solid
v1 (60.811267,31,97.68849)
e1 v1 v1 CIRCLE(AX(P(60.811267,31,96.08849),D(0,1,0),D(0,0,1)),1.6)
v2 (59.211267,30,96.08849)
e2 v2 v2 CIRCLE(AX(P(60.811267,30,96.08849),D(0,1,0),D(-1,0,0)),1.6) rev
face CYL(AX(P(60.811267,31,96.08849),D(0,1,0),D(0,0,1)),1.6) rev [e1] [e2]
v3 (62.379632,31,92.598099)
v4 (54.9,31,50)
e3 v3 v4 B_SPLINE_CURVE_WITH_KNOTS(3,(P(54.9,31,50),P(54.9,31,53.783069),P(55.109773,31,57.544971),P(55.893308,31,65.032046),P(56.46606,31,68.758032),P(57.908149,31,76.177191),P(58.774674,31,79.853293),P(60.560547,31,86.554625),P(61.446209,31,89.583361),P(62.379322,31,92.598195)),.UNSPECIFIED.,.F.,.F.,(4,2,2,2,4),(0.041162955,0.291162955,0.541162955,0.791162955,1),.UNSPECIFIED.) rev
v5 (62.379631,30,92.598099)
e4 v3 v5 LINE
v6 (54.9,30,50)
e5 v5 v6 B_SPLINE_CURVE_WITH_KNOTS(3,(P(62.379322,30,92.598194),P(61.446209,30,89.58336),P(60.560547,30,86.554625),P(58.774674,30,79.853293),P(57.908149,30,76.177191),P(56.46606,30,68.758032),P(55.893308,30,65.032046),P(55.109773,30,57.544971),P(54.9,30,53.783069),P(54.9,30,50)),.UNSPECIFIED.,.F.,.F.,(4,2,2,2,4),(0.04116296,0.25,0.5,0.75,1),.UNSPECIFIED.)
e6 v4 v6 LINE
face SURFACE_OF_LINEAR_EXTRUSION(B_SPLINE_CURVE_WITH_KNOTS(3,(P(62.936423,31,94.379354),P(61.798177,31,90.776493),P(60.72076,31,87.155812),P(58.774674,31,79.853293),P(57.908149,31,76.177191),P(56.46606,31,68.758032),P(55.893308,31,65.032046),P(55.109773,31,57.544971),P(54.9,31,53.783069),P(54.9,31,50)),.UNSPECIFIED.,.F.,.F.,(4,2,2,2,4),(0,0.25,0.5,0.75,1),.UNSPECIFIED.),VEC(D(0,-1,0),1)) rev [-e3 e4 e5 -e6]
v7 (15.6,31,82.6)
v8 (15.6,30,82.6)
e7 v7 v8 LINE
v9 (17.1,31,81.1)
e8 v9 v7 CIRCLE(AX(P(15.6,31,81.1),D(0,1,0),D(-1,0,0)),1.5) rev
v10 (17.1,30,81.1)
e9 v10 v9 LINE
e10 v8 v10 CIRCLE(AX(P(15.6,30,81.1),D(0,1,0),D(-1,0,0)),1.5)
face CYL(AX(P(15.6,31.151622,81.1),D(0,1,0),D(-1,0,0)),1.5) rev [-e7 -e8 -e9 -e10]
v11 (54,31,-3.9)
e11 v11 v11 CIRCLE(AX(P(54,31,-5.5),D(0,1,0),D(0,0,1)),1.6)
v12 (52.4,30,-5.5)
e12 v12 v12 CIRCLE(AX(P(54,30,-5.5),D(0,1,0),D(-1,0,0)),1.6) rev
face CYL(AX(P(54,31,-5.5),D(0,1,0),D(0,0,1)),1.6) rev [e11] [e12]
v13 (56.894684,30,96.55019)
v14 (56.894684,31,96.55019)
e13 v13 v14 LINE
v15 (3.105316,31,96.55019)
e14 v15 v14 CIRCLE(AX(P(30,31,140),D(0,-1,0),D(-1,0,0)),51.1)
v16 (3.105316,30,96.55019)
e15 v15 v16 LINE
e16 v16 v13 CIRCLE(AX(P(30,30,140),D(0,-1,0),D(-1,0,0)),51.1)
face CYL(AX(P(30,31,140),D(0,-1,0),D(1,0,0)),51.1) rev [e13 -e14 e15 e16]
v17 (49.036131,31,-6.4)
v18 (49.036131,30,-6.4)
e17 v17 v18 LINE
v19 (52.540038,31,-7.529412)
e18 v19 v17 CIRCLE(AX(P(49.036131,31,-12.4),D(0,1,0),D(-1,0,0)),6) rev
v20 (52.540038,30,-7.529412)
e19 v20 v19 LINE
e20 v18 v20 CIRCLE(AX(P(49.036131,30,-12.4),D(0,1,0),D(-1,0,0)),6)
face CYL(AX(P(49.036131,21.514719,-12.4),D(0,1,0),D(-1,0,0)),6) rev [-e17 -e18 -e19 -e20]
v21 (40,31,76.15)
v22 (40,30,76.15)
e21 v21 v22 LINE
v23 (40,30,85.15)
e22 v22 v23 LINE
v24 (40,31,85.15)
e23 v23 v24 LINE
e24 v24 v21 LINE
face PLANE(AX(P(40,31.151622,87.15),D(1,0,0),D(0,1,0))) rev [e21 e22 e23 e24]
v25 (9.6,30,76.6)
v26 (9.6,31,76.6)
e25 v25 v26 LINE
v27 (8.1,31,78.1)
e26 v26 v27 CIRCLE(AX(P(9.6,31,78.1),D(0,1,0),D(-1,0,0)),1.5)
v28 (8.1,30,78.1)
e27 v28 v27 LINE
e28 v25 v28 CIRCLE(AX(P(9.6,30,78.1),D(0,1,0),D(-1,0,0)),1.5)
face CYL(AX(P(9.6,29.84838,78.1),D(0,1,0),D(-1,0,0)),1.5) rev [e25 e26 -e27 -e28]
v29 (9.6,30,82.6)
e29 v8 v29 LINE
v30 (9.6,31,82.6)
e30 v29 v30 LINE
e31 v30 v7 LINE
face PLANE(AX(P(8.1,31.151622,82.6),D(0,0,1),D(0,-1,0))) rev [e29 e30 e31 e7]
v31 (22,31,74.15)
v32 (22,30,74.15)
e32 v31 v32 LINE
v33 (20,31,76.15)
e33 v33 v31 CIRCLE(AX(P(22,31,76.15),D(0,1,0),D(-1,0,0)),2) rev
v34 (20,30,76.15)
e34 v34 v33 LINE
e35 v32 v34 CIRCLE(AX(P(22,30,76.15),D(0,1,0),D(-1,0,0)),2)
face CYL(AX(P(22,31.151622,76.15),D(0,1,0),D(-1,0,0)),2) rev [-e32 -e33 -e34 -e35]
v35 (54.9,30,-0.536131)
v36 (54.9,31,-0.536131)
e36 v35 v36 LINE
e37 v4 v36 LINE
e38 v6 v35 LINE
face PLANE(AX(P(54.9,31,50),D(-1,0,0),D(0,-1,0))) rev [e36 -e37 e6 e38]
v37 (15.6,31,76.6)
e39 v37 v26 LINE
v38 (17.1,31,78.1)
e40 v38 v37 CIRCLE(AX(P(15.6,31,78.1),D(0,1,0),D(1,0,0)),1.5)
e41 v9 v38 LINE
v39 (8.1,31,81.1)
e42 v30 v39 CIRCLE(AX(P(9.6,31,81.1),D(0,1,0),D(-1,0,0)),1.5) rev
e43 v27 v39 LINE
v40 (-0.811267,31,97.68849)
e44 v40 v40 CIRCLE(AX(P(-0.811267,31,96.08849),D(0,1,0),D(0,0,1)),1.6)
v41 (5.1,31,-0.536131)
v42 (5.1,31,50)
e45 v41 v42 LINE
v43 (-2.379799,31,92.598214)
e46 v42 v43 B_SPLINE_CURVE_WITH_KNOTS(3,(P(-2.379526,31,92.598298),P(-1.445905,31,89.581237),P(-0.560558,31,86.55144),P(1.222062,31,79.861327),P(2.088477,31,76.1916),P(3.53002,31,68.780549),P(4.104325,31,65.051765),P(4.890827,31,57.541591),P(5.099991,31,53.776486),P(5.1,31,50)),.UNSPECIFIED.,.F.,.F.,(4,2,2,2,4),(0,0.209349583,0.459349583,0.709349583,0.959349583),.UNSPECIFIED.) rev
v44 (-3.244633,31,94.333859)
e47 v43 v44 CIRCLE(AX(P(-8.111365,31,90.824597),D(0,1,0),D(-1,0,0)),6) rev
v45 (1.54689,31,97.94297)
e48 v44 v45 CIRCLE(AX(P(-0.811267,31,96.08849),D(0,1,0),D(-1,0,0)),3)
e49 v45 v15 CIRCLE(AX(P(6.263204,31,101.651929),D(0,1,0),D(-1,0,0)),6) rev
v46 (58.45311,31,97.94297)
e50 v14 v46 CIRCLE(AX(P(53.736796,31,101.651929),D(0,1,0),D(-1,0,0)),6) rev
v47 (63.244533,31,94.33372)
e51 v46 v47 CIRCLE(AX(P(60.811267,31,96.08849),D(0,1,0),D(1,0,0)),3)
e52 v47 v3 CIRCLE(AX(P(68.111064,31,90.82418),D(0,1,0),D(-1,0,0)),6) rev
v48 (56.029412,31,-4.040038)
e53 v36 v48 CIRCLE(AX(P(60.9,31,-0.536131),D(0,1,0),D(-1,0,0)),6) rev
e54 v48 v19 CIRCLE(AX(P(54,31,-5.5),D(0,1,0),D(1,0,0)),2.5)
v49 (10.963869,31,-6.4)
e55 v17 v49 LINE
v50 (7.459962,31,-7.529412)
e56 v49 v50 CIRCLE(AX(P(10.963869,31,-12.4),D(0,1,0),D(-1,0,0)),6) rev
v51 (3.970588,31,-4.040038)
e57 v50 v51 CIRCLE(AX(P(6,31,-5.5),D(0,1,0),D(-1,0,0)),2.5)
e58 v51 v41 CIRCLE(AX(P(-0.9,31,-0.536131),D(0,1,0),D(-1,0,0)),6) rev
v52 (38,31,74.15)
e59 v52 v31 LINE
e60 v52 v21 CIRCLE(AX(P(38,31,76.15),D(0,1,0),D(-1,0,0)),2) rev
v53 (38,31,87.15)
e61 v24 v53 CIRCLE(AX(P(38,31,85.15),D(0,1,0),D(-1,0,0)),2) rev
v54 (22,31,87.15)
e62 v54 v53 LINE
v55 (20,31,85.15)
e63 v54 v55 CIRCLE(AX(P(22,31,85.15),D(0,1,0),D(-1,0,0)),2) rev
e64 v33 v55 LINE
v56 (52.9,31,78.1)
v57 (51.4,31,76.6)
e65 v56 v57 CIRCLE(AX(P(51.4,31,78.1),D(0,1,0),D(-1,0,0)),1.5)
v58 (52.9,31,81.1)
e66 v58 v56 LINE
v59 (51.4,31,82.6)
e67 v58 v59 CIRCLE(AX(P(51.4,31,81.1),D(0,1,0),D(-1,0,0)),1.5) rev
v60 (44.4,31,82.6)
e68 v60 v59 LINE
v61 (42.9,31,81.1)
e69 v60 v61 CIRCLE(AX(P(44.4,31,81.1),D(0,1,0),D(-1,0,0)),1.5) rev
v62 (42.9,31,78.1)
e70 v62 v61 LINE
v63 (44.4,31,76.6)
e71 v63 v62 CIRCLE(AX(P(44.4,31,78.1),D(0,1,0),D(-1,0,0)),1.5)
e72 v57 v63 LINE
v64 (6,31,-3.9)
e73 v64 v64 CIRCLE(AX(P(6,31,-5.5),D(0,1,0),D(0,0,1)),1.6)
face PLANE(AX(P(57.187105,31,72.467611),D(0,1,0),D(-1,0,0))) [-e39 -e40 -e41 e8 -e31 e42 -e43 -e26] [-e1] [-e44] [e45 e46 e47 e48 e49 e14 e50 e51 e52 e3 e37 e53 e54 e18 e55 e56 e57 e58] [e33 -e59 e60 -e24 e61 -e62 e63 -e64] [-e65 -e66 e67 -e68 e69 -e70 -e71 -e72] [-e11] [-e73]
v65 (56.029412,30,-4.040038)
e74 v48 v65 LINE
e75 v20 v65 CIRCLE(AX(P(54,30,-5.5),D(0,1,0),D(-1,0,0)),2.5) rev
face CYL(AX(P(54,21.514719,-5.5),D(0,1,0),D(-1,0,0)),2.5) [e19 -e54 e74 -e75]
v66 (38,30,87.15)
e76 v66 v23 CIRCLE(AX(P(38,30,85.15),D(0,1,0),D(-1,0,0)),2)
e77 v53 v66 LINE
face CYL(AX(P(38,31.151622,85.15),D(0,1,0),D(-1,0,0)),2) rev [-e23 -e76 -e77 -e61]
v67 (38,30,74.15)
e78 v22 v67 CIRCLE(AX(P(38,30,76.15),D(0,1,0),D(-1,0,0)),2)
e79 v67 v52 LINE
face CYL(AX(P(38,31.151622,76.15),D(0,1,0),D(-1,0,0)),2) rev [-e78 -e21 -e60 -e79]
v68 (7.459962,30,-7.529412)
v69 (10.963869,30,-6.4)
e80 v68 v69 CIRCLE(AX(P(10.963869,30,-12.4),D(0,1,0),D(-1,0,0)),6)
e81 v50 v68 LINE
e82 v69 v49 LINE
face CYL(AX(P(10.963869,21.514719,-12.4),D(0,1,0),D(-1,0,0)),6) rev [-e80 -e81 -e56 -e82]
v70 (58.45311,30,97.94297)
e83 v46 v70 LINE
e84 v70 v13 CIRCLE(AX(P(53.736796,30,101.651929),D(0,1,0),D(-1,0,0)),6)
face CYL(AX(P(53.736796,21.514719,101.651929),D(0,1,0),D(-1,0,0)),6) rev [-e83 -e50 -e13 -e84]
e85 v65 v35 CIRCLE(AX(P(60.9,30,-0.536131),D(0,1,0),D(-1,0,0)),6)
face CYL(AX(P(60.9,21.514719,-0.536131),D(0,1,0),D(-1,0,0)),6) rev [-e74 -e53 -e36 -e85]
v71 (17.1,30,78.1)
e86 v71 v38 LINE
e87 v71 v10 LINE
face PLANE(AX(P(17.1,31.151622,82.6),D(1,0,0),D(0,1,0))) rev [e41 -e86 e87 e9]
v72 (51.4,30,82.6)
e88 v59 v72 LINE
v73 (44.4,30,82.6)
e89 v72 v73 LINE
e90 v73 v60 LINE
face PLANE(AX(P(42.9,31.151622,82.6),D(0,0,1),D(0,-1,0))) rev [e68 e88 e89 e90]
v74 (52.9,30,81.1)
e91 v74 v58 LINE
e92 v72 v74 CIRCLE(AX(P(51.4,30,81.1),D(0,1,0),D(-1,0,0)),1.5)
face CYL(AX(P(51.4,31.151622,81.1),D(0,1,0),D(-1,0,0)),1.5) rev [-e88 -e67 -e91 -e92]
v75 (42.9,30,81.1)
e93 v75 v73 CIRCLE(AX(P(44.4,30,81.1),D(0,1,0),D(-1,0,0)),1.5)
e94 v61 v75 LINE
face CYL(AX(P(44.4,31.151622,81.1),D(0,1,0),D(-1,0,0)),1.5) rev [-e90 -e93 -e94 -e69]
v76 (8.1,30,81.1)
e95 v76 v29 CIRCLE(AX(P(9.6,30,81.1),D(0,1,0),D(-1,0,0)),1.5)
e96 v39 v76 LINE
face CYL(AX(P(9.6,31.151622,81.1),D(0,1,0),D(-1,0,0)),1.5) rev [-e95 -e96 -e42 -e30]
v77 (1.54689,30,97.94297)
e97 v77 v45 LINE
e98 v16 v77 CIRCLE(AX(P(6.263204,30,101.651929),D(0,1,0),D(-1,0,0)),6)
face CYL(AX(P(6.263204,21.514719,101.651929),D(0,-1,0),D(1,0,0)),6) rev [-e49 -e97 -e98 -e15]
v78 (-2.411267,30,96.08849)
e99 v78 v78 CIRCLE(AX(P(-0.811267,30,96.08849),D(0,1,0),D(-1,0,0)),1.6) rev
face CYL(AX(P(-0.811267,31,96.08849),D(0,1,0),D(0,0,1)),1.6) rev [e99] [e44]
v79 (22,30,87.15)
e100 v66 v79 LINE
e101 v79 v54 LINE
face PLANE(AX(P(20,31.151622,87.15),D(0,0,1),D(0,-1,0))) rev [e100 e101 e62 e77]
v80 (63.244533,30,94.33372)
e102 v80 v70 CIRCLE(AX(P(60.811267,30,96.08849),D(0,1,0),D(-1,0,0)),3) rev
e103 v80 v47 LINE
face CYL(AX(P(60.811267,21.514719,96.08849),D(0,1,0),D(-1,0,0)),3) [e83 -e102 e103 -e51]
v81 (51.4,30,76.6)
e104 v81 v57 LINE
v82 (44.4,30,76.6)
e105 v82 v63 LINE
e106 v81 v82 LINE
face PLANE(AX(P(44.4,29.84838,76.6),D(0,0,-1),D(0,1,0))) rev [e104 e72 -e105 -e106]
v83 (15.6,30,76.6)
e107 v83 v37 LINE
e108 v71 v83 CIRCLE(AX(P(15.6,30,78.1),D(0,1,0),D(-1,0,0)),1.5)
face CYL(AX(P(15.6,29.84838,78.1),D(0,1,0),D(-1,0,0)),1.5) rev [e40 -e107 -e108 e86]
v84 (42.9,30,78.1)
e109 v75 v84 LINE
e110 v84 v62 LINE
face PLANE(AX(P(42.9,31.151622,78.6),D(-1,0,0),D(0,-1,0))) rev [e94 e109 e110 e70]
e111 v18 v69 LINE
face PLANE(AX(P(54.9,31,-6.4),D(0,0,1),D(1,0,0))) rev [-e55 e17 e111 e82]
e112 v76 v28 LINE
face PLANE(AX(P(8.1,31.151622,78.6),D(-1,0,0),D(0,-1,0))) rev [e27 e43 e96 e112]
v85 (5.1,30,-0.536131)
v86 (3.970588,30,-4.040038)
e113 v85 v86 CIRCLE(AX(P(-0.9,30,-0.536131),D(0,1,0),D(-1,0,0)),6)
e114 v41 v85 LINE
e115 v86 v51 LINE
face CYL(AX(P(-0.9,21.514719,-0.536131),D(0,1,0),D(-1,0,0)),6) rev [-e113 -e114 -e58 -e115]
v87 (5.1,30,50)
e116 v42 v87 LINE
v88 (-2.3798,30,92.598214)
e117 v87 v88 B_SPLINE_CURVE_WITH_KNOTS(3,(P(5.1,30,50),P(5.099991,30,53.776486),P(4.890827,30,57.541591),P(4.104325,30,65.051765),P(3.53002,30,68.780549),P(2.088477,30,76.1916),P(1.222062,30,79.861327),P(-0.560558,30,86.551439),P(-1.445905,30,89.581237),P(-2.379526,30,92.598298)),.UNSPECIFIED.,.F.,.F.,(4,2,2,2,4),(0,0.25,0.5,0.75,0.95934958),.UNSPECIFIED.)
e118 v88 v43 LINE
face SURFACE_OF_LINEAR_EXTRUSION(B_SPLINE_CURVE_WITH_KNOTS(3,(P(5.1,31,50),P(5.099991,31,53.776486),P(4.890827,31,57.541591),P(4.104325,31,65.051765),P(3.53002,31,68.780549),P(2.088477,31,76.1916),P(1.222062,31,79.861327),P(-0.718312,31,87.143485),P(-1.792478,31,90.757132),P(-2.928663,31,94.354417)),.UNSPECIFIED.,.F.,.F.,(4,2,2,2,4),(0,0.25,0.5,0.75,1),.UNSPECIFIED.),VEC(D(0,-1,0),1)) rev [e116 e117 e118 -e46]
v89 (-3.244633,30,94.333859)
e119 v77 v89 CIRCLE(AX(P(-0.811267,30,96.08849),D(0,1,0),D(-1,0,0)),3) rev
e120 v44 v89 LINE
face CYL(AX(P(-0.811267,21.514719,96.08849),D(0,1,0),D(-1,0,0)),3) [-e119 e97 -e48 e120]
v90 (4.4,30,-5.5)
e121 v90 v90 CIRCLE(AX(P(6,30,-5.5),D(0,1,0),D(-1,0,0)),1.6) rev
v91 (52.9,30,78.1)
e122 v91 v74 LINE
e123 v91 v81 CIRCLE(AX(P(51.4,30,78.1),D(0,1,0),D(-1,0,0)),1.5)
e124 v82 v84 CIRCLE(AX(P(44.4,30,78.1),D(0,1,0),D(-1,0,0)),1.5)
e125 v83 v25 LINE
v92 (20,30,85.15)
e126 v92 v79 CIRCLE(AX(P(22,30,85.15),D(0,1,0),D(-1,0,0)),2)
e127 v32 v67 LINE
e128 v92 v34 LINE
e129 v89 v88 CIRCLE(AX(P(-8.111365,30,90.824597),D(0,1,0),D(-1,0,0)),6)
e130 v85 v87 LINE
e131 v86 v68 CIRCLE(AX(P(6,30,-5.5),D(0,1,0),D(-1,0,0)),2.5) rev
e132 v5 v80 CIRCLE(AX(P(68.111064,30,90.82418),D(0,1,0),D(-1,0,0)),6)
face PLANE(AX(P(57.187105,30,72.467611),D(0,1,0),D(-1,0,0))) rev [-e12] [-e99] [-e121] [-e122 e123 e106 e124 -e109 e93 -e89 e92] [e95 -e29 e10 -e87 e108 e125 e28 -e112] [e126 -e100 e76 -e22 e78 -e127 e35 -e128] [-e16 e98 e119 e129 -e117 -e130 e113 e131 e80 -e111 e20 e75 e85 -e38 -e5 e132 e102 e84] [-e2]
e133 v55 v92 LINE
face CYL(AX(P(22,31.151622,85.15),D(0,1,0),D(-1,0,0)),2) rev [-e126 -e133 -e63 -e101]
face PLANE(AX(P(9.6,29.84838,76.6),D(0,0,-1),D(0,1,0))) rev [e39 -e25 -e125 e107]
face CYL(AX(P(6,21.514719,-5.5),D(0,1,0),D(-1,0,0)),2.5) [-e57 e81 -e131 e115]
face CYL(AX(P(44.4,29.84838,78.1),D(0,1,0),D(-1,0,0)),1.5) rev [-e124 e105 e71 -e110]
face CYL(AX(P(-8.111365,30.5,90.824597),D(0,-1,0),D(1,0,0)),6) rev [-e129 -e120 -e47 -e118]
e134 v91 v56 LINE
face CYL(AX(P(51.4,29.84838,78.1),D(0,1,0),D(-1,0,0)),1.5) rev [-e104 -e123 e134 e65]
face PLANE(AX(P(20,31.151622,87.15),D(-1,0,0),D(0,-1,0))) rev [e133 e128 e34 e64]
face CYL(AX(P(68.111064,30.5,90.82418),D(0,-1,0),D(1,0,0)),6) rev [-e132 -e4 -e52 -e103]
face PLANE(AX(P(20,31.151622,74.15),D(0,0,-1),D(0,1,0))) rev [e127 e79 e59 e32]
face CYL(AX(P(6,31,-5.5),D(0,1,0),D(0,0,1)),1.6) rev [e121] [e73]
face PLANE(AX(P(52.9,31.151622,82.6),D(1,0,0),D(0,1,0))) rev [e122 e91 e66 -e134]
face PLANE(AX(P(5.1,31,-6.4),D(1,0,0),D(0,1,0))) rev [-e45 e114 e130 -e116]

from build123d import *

# Parameters (mm, degrees)
COVER_MAIN_BOARD_1_START = 30
COVER_MAIN_BOARD_1_DEPTH = 1
SKETCH_2_R               = 2.5
SKETCH_2_R_2             = 3
EXTRUDE_1_DEPTH          = 1
FILLET_1_R               = 6
HOLE_WIZARD_M31_D        = 3.2
SKETCH_5_W               = 20
SKETCH_5_H               = 13
CUT_EXTRUDE_2_DEPTH      = 118.861812366
FILLET_2_R               = 2
SKETCH_7_W               = 10
SKETCH_7_H               = 4
SKETCH_7_W_2             = 9
CUT_EXTRUDE_4_DEPTH      = 118.861812366
FILLET_3_R               = 1.5
CUT_EXTRUDE_5_DEPTH      = 118.861812366


# Read off the part's stored shape, not the designer's step: Припуск-Cover_main_board-1
with BuildPart() as part:
    # Припуск-Cover_main_board-1 outline → Припуск-Cover_main_board-1 (new body)
    with BuildSketch(Plane(origin=(0, 0, 0), x_dir=(1, 0, 0), z_dir=(0, 1, 0)).offset(COVER_MAIN_BOARD_1_START)):
        with BuildLine():
            ThreePointArc((58.536662962, -97.610509717), (61.872887908, -97.542255565), (62.936422695, -94.379353532))
            add(Edge.make_bspline(
                [(62.936422695, -94.379353532), (61.798177223, -90.776493028), (60.72075986, -87.155811957), (58.774674414, -79.85329338), (57.908149184, -76.177190929), (56.466060339, -68.758031881), (55.893308454, -65.032046108), (55.109773151, -57.544971093), (54.899999704, -53.783069267), (54.9, -50)],
                knots=[0, 0, 0, 0, 0.25, 0.25, 0.5, 0.5, 0.75, 0.75, 1, 1, 1, 1], degree=3))
            Line((54.9, -50), (54.9, 6.4))
            Line((54.9, 6.4), (5.1, 6.4))
            Line((5.1, 6.4), (5.1, -50))
            add(Edge.make_bspline(
                [(5.1, -50), (5.099991031, -53.776486453), (4.890826579, -57.541590974), (4.10432522, -65.051764617), (3.53002006, -68.780548712), (2.088476888, -76.191600122), (1.222062078, -79.86132679), (-0.718312327, -87.143485068), (-1.7924779, -90.75713228), (-2.928662588, -94.354417399)],
                knots=[0, 0, 0, 0, 0.25, 0.25, 0.5, 0.5, 0.75, 0.75, 1, 1, 1, 1], degree=3))
            ThreePointArc((-2.928662588, -94.354417399), (-1.883263044, -97.534459074), (1.463338472, -97.610508751))
            ThreePointArc((1.463338472, -97.610508751), (30.000000864, -88.89999981), (58.536662962, -97.610509717))
        make_face()
    extrude(amount=COVER_MAIN_BOARD_1_DEPTH)

    # Эскиз2 → Бобышка-Вытянуть1 (add)
    with BuildSketch(Plane(origin=(0, 31, 0), x_dir=(1, 0, 0), z_dir=(0, 1, 0))):
        with Locations((6, 5.5)):
            Circle(SKETCH_2_R)
        with Locations((54, 5.5)):
            Circle(SKETCH_2_R)
        with Locations((-0.811267397, -96.088490424)):
            Circle(SKETCH_2_R_2)
        with Locations((60.811267397, -96.088490424)):
            Circle(SKETCH_2_R_2)
    extrude(amount=-EXTRUDE_1_DEPTH)

    # Скругление1
    fillet_1_edges = [part.edges().sort_by_distance(p)[0] for p in [
        (-2.75519034, 30.5, 93.803503862),
        (1.934506666, 30.5, 97.297094907),
        (58.065493335, 30.5, 97.297094908),
        (62.755023846, 30.5, 93.803362229),
        (54.9, 30.5, -3.167619242),
        (51.667619242, 30.5, -6.4),
        (8.332380758, 30.5, -6.4),
        (5.1, 30.5, -3.167619242),
    ]]
    fillet(fillet_1_edges, radius=FILLET_1_R)

    # Отверстие с зазором M31 (through all)
    with Locations(Plane(origin=(0, 31, 0), x_dir=(1, 0, 0), z_dir=(0, 1, 0))):
        with Locations((-0.811267397, -96.088490424), (60.811267397, -96.088490424), (54, 5.5), (6, 5.5)):
            Hole(HOLE_WIZARD_M31_D / 2)

    # Эскиз5 → Вырез-Вытянуть2 (cut, through all)
    with BuildSketch(Plane.XZ.offset(-30)):
        with Locations((30, 80.64999981)):
            Rectangle(SKETCH_5_W, SKETCH_5_H)
    extrude(amount=-CUT_EXTRUDE_2_DEPTH, mode=Mode.SUBTRACT)

    # Скругление2
    fillet_2_edges = [part.edges().sort_by_distance(p)[0] for p in [
        (40, 30.5, 87.14999981),
        (40, 30.5, 74.14999981),
        (20, 30.5, 74.14999981),
        (20, 30.5, 87.14999981),
    ]]
    fillet(fillet_2_edges, radius=FILLET_2_R)

    # Эскиз7 → Вырез-Вытянуть4 (cut, through all)
    with BuildSketch(Plane.XZ.offset(-30)):
        with Locations((47.9, 80.6)):
            Rectangle(SKETCH_7_W, SKETCH_7_H)
        with Locations((12.6, 80.6)):
            Rectangle(SKETCH_7_W_2, SKETCH_7_H)
    extrude(amount=-CUT_EXTRUDE_4_DEPTH, mode=Mode.SUBTRACT)

    # Скругление3
    fillet_3_edges = [part.edges().sort_by_distance(p)[0] for p in [
        (42.9, 30.5, 78.6),
        (42.9, 30.5, 82.6),
        (52.9, 30.5, 82.6),
        (52.9, 30.5, 78.6),
        (17.1, 30.5, 82.6),
        (17.1, 30.5, 78.6),
        (8.1, 30.5, 78.6),
        (8.1, 30.5, 82.6),
    ]]
    fillet(fillet_3_edges, radius=FILLET_3_R)

    # Эскиз10 → Вырез-Вытянуть5 (cut, through all)
    with BuildSketch(Plane(origin=(0, 31, 0), x_dir=(1, 0, 0), z_dir=(0, 1, 0))):
        with BuildLine():
            Line((42.9, -80.1), (52.9, -80.1))
            Line((52.9, -80.1), (52.9, -78.1))
            ThreePointArc((52.9, -78.1), (52.460660172, -77.039339828), (51.4, -76.6))
            Line((51.4, -76.6), (44.4, -76.6))
            ThreePointArc((44.4, -76.6), (43.339339828, -77.039339828), (42.9, -78.1))
            Line((42.9, -78.1), (42.9, -80.1))
        make_face()
        with BuildLine():
            Line((8.1, -80.1), (17.1, -80.1))
            Line((17.1, -80.1), (17.1, -78.1))
            ThreePointArc((17.1, -78.1), (16.660660172, -77.039339828), (15.6, -76.6))
            Line((15.6, -76.6), (9.6, -76.6))
            ThreePointArc((9.6, -76.6), (8.539339828, -77.039339828), (8.1, -78.1))
            Line((8.1, -78.1), (8.1, -80.1))
        make_face()
    extrude(amount=-CUT_EXTRUDE_5_DEPTH, mode=Mode.SUBTRACT)


solid = part.part
